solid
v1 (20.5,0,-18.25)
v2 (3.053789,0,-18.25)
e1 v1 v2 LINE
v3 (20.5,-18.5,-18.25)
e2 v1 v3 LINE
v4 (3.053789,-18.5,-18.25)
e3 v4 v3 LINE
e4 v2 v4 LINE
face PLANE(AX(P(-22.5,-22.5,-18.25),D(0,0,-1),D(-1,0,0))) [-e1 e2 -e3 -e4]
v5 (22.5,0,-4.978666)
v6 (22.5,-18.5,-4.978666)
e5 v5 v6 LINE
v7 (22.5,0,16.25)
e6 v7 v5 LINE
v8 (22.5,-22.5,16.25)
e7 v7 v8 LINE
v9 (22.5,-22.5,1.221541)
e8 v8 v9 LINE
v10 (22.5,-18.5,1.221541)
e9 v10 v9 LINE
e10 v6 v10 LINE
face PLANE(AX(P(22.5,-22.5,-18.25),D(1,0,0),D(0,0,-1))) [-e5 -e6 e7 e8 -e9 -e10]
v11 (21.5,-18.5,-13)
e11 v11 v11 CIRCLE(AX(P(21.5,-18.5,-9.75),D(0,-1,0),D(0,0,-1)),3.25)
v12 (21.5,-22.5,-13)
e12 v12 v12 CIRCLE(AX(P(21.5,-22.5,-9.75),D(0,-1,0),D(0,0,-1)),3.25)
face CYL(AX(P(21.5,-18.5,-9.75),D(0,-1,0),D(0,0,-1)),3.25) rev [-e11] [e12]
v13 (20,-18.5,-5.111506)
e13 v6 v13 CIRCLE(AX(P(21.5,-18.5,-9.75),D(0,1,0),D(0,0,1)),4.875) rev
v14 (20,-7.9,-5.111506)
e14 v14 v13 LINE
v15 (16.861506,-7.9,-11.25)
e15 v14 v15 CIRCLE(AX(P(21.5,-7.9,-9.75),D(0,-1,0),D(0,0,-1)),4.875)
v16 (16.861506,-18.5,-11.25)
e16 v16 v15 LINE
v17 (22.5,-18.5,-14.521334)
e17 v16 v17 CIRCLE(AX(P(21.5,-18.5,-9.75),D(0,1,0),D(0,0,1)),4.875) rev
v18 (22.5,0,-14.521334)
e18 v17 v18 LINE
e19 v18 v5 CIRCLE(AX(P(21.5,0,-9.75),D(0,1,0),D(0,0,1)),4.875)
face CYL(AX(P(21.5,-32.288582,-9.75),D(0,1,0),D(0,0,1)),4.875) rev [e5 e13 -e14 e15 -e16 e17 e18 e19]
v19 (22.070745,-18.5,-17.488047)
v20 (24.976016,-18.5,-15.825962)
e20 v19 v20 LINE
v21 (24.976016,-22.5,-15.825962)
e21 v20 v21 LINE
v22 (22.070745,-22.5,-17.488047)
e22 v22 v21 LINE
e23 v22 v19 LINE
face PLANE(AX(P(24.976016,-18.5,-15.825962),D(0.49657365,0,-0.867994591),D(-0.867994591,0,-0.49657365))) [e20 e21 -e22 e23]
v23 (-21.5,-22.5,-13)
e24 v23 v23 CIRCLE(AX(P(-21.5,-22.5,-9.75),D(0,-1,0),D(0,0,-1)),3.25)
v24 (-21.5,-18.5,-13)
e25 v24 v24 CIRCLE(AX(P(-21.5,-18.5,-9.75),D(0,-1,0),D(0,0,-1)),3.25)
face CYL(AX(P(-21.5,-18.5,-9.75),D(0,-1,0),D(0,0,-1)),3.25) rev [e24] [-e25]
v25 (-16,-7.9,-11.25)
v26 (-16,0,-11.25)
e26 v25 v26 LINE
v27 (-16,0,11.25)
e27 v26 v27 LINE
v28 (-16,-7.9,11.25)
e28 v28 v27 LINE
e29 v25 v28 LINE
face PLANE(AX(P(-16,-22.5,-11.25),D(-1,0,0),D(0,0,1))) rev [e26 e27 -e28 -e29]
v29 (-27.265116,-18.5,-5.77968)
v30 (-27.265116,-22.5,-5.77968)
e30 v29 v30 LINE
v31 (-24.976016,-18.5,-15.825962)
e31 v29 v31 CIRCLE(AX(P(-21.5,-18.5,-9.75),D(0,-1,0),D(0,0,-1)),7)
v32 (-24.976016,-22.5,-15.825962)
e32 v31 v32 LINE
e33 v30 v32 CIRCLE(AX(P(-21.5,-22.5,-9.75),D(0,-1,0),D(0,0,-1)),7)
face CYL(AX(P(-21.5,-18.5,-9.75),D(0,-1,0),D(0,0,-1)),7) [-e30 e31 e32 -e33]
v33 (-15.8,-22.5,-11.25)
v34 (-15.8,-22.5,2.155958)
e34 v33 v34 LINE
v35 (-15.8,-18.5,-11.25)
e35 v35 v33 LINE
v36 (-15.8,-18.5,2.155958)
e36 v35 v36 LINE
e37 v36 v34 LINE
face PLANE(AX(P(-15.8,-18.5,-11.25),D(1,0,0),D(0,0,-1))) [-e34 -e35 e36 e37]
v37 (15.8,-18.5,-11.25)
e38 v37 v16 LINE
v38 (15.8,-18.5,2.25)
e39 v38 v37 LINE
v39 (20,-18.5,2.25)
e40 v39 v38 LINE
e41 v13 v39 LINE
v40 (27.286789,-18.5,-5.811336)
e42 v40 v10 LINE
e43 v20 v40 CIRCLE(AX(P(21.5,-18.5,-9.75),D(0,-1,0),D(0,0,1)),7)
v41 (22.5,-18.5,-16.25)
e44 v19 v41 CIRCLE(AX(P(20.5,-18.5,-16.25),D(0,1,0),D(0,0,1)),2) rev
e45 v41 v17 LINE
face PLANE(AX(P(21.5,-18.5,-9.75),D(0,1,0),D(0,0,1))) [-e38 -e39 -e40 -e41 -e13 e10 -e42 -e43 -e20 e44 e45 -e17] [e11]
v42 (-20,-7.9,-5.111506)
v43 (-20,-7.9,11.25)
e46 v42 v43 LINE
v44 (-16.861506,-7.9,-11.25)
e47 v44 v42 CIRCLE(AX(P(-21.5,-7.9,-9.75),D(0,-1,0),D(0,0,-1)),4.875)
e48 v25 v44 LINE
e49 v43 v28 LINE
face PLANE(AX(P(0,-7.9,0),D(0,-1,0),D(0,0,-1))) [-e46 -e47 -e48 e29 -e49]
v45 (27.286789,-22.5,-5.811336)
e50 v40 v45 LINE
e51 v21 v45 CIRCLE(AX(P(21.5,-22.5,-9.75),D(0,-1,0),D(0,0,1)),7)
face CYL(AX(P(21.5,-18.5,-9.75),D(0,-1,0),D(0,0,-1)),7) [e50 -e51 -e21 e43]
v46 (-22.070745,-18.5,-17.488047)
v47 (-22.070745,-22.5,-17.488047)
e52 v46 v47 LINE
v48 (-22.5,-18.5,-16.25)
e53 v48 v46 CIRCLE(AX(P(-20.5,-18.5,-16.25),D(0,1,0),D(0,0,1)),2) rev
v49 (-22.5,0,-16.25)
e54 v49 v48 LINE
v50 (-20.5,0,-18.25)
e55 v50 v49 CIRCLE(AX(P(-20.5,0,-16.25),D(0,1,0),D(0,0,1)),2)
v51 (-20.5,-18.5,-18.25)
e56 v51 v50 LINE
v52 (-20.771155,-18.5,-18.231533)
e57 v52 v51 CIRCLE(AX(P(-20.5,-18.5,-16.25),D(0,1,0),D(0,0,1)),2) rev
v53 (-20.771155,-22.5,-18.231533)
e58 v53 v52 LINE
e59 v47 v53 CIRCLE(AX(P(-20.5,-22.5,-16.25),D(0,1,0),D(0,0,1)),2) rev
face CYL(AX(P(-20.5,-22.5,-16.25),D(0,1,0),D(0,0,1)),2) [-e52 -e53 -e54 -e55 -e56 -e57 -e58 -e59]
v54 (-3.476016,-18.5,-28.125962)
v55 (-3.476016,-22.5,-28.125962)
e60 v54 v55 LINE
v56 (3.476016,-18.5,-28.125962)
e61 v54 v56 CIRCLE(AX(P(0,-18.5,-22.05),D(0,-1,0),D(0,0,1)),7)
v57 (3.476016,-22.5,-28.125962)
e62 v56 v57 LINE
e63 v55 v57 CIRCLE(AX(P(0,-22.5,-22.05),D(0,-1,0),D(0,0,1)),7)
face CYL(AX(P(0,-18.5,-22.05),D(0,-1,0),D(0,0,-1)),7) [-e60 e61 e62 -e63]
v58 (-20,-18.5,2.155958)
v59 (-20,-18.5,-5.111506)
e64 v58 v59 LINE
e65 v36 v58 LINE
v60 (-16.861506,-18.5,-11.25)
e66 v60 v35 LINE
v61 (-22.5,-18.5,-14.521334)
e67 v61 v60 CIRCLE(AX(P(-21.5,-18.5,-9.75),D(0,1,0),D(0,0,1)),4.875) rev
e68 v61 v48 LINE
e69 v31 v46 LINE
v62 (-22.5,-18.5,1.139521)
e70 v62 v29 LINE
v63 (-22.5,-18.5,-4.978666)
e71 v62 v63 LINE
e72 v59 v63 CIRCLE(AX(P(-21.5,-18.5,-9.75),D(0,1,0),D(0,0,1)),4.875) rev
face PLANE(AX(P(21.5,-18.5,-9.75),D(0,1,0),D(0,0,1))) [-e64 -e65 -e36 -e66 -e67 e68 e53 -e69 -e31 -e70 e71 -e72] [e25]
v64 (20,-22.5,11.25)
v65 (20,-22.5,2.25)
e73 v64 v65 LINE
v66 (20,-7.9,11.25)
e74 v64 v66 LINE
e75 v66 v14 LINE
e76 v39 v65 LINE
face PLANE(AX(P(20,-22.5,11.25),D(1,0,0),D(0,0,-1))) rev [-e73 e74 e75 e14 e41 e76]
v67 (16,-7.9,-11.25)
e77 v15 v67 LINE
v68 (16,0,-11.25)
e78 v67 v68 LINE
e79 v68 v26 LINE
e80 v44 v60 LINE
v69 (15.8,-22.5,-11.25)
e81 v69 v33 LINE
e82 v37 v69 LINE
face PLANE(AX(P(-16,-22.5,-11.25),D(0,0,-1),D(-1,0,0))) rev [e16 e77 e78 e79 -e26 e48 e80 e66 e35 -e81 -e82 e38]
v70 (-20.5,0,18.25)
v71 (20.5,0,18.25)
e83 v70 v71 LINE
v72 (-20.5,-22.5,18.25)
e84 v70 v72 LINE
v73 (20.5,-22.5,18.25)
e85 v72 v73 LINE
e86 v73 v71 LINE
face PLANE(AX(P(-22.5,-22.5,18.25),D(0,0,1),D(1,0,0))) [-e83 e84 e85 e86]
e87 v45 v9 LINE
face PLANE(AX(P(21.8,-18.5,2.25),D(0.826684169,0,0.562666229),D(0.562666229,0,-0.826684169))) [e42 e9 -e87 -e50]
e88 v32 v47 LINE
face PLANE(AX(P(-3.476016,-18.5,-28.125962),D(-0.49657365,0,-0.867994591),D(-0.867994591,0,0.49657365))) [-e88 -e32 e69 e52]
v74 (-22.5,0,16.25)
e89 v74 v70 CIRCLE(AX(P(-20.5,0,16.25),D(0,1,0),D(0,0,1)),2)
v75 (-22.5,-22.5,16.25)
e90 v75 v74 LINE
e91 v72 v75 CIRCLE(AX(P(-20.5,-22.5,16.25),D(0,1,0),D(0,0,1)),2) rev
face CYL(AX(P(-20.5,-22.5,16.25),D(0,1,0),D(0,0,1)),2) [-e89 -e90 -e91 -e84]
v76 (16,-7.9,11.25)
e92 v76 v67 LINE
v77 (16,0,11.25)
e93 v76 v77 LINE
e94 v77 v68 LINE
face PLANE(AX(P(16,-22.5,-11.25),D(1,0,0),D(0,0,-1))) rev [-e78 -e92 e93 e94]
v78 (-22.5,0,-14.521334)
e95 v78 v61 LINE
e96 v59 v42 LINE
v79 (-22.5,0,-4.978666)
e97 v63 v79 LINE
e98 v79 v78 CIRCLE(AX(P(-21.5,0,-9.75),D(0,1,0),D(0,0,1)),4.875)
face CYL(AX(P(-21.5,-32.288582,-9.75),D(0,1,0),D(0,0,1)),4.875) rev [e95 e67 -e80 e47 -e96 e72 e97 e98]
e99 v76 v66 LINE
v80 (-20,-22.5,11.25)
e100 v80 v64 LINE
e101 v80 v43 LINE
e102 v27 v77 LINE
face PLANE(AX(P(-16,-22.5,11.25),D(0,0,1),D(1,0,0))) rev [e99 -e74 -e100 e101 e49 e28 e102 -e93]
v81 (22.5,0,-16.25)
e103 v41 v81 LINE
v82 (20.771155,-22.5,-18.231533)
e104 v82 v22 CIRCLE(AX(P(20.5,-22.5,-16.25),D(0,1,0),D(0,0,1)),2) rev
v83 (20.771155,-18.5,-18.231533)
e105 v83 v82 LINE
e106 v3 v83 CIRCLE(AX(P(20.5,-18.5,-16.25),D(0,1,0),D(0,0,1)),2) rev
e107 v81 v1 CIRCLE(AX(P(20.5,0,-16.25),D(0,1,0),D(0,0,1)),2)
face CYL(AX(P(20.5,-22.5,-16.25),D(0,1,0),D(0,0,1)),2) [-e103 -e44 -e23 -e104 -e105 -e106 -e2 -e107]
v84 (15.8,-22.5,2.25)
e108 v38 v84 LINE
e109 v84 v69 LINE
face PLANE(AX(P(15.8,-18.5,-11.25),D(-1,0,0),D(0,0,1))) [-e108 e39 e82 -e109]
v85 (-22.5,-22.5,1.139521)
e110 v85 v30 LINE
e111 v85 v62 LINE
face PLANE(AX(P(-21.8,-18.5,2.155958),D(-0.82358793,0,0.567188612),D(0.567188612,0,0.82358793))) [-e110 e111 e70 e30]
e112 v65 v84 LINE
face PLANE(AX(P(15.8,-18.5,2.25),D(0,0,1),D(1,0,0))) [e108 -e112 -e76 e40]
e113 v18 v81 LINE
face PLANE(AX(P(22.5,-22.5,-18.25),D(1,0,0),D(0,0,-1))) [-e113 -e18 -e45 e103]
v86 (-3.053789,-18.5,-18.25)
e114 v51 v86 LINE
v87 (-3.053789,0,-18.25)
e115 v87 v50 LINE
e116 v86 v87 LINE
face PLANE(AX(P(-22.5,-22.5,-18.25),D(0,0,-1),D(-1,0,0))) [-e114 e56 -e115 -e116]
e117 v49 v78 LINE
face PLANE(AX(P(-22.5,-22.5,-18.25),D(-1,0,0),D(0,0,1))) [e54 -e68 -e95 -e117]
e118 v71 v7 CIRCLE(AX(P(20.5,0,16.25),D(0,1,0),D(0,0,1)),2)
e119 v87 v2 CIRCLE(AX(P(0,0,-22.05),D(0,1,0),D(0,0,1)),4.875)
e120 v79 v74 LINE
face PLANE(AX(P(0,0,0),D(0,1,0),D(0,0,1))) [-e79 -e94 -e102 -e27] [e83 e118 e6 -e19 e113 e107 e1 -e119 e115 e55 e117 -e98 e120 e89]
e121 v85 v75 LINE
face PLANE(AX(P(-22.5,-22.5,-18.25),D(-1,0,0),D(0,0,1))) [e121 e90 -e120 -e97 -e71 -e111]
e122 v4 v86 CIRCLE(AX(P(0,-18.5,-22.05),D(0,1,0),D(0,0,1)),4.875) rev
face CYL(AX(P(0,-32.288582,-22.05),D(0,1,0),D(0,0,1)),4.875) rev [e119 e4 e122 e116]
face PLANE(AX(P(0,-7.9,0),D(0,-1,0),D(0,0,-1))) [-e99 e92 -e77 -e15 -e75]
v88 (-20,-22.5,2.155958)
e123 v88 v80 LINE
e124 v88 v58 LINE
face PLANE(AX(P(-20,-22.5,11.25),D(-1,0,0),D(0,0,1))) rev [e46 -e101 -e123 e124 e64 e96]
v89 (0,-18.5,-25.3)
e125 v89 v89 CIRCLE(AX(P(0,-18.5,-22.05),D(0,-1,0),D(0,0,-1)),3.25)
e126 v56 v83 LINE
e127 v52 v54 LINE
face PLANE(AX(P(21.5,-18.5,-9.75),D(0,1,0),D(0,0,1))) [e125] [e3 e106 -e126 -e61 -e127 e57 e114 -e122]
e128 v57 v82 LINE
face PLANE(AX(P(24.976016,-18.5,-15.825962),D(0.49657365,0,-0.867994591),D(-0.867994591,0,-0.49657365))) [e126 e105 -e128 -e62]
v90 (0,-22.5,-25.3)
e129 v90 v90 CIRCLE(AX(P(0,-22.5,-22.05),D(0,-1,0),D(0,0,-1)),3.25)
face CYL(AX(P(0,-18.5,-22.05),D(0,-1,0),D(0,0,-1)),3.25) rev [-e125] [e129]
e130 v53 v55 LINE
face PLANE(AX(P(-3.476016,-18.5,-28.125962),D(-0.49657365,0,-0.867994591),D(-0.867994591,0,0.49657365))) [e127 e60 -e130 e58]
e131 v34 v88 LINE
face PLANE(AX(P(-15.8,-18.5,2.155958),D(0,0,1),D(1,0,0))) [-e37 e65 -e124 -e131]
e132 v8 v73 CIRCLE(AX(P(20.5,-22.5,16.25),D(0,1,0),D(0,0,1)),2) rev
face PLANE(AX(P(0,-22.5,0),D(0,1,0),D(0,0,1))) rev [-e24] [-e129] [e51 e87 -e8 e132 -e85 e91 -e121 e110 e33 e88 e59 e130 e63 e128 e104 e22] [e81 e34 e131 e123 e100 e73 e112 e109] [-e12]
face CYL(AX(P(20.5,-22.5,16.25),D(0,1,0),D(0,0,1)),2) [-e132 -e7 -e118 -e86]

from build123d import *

# Parameters (mm, degrees)
SKETCH2_W           = 45
SKETCH2_H           = 36.5
SKETCH2_W_2         = 32
SKETCH2_H_2         = 22.5
BOSS_EXTRUDE2_DEPTH = 22.5
SKETCH3_W           = 40
SKETCH3_H           = 22.5
CUT_EXTRUDE1_DEPTH  = 33.441832562
SKETCH5_R           = 3.25
BOSS_EXTRUDE3_DEPTH = 4
SKETCH7_R           = 3.25
CUT_EXTRUDE2_DEPTH  = 47.501639756
CUT_EXTRUDE3_START  = -18.5
SKETCH8_R           = 4.875
CUT_EXTRUDE3_DEPTH  = 18.5
FILLET1_R           = 2


with BuildPart() as part:
    # Sketch2 → Boss-Extrude2 (new body)
    with BuildSketch(Plane(origin=(0, 0, 0), x_dir=(1, 0, 0), z_dir=(0, 1, 0))):
        Rectangle(SKETCH2_W, SKETCH2_H)
        Rectangle(SKETCH2_W_2, SKETCH2_H_2, mode=Mode.SUBTRACT)
    extrude(amount=-BOSS_EXTRUDE2_DEPTH)

    # Sketch3 → Cut-Extrude1 (cut, through all)
    with BuildSketch(Plane(origin=(0, -7.9, 0), x_dir=(1, 0, 0), z_dir=(0, 1, 0))):
        Rectangle(SKETCH3_W, SKETCH3_H)
    extrude(amount=-CUT_EXTRUDE1_DEPTH, mode=Mode.SUBTRACT)

    # Sketch5 → Boss-Extrude3 (add)
    with BuildSketch(Plane(origin=(0, -22.5, 0), x_dir=(-1, 0, 0), z_dir=(0, -1, 0))):
        with BuildLine():
            Line((-24.976015549, 15.825962138), (-3.476015549, 28.125962138))
            ThreePointArc((-3.476015549, 28.125962138), (0, 29.05), (3.476015549, 28.125962138))
            Line((3.476015549, 28.125962138), (24.976015549, 15.825962138))
            ThreePointArc((24.976015549, 15.825962138), (28.325069482, 11.305129115), (27.265115511, 5.779679718))
            Line((27.265115511, 5.779679718), (21.8, -2.155957702))
            Line((21.8, -2.155957702), (15.8, -2.155957702))
            Line((15.8, -2.155957702), (15.8, 11.25))
            Line((15.8, 11.25), (-15.8, 11.25))
            Line((-15.8, 11.25), (-15.8, -2.25))
            Line((-15.8, -2.25), (-21.8, -2.25))
            Line((-21.8, -2.25), (-27.28678918, 5.811336396))
            ThreePointArc((-27.28678918, 5.811336396), (-28.320782217, 11.323826531), (-24.976015549, 15.825962138))
        make_face()
        with Locations((21.5, 9.75)):
            Circle(SKETCH5_R, mode=Mode.SUBTRACT)
        with Locations((-21.5, 9.75)):
            Circle(SKETCH5_R, mode=Mode.SUBTRACT)
        with Locations(Location((0, 22.05, 0), (0, 0, 90))):
            Circle(SKETCH5_R, mode=Mode.SUBTRACT)
    extrude(amount=-BOSS_EXTRUDE3_DEPTH)

    # Sketch7 → Cut-Extrude2 (cut, through all)
    with BuildSketch(Plane(origin=(0, -22.5, 0), x_dir=(-1, 0, 0), z_dir=(0, -1, 0))):
        with Locations(Location((-21.5, 9.75, 0), (0, 0, 90))):
            Circle(SKETCH7_R)
        with Locations(Location((0, 22.05, 0), (0, 0, 90))):
            Circle(SKETCH7_R)
        with Locations(Location((21.5, 9.75, 0), (0, 0, 90))):
            Circle(SKETCH7_R)
    extrude(amount=-CUT_EXTRUDE2_DEPTH, mode=Mode.SUBTRACT)

    # Sketch8 → Cut-Extrude3 (cut)
    with BuildSketch(Plane(origin=(0, 0, 0), x_dir=(1, 0, 0), z_dir=(0, 1, 0)).offset(CUT_EXTRUDE3_START)):
        with Locations((0, 22.05)):
            Circle(SKETCH8_R)
        with Locations((-21.5, 9.75)):
            Circle(SKETCH8_R)
        with Locations((21.5, 9.75)):
            Circle(SKETCH8_R)
    extrude(amount=CUT_EXTRUDE3_DEPTH, mode=Mode.SUBTRACT)

    # Fillet1
    # the kernel refuses this fillet: 2 mm, written as the material it takes off along each edge
    with BuildSketch(Plane(origin=(-22.5, 5, -18.25), x_dir=(1, 0, 0), z_dir=(0, -1, 0))) as fillet1_piece_1_section:
        with BuildLine():
            CenterArc((FILLET1_R, FILLET1_R), FILLET1_R, 180, 90)
            Line((0, FILLET1_R), (0, 0))
            Line((0, 0), (FILLET1_R, 0))
        make_face()
    fillet1_piece_1 = extrude(amount=32.5, mode=Mode.PRIVATE)
    fillet1_piece_1 = split(fillet1_piece_1, bisect_by=Plane(origin=(-20.691017739, -18.5, -18.244599527), z_dir=(0, 1, 0)), keep=Keep.TOP, mode=Mode.PRIVATE)
    add(fillet1_piece_1, mode=Mode.SUBTRACT)
    with BuildSketch(Plane(origin=(-22.5, 5, -18.25), x_dir=(1, 0, 0), z_dir=(0, -1, 0))) as fillet1_piece_2_section:
        with BuildLine():
            CenterArc((FILLET1_R, FILLET1_R), FILLET1_R, 180, 90)
            Line((0, FILLET1_R), (0, 0))
            Line((0, 0), (FILLET1_R, 0))
        make_face()
    fillet1_piece_2 = extrude(amount=32.5, mode=Mode.PRIVATE)
    fillet1_piece_2 = split(fillet1_piece_2, bisect_by=Plane(origin=(-21.836723919, -20.5, -17.621928978), z_dir=(-0.49657364983015595, 0, -0.8679945911665335)), keep=Keep.TOP, mode=Mode.PRIVATE)
    add(fillet1_piece_2, mode=Mode.SUBTRACT)
    with BuildSketch(Plane(origin=(22.5, 5, -18.25), x_dir=(0, 0, 1), z_dir=(0, -1, 0))) as fillet1_piece_3_section:
        with BuildLine():
            CenterArc((FILLET1_R, FILLET1_R), FILLET1_R, 180, 90)
            Line((0, FILLET1_R), (0, 0))
            Line((0, 0), (FILLET1_R, 0))
        make_face()
    fillet1_piece_3 = extrude(amount=32.5, mode=Mode.PRIVATE)
    fillet1_piece_3 = split(fillet1_piece_3, bisect_by=Plane(origin=(22.38175336, -18.5, -17.085383577), z_dir=(0, 1, 0)), keep=Keep.TOP, mode=Mode.PRIVATE)
    add(fillet1_piece_3, mode=Mode.SUBTRACT)
    with BuildSketch(Plane(origin=(22.5, 5, -18.25), x_dir=(0, 0, 1), z_dir=(0, -1, 0))) as fillet1_piece_4_section:
        with BuildLine():
            CenterArc((FILLET1_R, FILLET1_R), FILLET1_R, 180, 90)
            Line((0, FILLET1_R), (0, 0))
            Line((0, 0), (FILLET1_R, 0))
        make_face()
    fillet1_piece_4 = extrude(amount=32.5, mode=Mode.PRIVATE)
    fillet1_piece_4 = split(fillet1_piece_4, bisect_by=Plane(origin=(21.836723919, -20.5, -17.621928978), z_dir=(0.49657364983015595, 0, -0.8679945911665338)), keep=Keep.TOP, mode=Mode.PRIVATE)
    add(fillet1_piece_4, mode=Mode.SUBTRACT)
    with BuildSketch(Plane(origin=(-22.5, 5, 18.25), x_dir=(1, 0, 0), z_dir=(0, -1, 0)), Plane(origin=(22.5, 5, 18.25), x_dir=(0, 0, -1), z_dir=(0, -1, 0))) as fillet1_piece_5:
        with BuildLine():
            CenterArc((FILLET1_R, -FILLET1_R), FILLET1_R, 90, 90)
            Line((0, -FILLET1_R), (0, 0))
            Line((0, 0), (FILLET1_R, 0))
        make_face()
    extrude(amount=32.5, mode=Mode.SUBTRACT)


solid = part.part
